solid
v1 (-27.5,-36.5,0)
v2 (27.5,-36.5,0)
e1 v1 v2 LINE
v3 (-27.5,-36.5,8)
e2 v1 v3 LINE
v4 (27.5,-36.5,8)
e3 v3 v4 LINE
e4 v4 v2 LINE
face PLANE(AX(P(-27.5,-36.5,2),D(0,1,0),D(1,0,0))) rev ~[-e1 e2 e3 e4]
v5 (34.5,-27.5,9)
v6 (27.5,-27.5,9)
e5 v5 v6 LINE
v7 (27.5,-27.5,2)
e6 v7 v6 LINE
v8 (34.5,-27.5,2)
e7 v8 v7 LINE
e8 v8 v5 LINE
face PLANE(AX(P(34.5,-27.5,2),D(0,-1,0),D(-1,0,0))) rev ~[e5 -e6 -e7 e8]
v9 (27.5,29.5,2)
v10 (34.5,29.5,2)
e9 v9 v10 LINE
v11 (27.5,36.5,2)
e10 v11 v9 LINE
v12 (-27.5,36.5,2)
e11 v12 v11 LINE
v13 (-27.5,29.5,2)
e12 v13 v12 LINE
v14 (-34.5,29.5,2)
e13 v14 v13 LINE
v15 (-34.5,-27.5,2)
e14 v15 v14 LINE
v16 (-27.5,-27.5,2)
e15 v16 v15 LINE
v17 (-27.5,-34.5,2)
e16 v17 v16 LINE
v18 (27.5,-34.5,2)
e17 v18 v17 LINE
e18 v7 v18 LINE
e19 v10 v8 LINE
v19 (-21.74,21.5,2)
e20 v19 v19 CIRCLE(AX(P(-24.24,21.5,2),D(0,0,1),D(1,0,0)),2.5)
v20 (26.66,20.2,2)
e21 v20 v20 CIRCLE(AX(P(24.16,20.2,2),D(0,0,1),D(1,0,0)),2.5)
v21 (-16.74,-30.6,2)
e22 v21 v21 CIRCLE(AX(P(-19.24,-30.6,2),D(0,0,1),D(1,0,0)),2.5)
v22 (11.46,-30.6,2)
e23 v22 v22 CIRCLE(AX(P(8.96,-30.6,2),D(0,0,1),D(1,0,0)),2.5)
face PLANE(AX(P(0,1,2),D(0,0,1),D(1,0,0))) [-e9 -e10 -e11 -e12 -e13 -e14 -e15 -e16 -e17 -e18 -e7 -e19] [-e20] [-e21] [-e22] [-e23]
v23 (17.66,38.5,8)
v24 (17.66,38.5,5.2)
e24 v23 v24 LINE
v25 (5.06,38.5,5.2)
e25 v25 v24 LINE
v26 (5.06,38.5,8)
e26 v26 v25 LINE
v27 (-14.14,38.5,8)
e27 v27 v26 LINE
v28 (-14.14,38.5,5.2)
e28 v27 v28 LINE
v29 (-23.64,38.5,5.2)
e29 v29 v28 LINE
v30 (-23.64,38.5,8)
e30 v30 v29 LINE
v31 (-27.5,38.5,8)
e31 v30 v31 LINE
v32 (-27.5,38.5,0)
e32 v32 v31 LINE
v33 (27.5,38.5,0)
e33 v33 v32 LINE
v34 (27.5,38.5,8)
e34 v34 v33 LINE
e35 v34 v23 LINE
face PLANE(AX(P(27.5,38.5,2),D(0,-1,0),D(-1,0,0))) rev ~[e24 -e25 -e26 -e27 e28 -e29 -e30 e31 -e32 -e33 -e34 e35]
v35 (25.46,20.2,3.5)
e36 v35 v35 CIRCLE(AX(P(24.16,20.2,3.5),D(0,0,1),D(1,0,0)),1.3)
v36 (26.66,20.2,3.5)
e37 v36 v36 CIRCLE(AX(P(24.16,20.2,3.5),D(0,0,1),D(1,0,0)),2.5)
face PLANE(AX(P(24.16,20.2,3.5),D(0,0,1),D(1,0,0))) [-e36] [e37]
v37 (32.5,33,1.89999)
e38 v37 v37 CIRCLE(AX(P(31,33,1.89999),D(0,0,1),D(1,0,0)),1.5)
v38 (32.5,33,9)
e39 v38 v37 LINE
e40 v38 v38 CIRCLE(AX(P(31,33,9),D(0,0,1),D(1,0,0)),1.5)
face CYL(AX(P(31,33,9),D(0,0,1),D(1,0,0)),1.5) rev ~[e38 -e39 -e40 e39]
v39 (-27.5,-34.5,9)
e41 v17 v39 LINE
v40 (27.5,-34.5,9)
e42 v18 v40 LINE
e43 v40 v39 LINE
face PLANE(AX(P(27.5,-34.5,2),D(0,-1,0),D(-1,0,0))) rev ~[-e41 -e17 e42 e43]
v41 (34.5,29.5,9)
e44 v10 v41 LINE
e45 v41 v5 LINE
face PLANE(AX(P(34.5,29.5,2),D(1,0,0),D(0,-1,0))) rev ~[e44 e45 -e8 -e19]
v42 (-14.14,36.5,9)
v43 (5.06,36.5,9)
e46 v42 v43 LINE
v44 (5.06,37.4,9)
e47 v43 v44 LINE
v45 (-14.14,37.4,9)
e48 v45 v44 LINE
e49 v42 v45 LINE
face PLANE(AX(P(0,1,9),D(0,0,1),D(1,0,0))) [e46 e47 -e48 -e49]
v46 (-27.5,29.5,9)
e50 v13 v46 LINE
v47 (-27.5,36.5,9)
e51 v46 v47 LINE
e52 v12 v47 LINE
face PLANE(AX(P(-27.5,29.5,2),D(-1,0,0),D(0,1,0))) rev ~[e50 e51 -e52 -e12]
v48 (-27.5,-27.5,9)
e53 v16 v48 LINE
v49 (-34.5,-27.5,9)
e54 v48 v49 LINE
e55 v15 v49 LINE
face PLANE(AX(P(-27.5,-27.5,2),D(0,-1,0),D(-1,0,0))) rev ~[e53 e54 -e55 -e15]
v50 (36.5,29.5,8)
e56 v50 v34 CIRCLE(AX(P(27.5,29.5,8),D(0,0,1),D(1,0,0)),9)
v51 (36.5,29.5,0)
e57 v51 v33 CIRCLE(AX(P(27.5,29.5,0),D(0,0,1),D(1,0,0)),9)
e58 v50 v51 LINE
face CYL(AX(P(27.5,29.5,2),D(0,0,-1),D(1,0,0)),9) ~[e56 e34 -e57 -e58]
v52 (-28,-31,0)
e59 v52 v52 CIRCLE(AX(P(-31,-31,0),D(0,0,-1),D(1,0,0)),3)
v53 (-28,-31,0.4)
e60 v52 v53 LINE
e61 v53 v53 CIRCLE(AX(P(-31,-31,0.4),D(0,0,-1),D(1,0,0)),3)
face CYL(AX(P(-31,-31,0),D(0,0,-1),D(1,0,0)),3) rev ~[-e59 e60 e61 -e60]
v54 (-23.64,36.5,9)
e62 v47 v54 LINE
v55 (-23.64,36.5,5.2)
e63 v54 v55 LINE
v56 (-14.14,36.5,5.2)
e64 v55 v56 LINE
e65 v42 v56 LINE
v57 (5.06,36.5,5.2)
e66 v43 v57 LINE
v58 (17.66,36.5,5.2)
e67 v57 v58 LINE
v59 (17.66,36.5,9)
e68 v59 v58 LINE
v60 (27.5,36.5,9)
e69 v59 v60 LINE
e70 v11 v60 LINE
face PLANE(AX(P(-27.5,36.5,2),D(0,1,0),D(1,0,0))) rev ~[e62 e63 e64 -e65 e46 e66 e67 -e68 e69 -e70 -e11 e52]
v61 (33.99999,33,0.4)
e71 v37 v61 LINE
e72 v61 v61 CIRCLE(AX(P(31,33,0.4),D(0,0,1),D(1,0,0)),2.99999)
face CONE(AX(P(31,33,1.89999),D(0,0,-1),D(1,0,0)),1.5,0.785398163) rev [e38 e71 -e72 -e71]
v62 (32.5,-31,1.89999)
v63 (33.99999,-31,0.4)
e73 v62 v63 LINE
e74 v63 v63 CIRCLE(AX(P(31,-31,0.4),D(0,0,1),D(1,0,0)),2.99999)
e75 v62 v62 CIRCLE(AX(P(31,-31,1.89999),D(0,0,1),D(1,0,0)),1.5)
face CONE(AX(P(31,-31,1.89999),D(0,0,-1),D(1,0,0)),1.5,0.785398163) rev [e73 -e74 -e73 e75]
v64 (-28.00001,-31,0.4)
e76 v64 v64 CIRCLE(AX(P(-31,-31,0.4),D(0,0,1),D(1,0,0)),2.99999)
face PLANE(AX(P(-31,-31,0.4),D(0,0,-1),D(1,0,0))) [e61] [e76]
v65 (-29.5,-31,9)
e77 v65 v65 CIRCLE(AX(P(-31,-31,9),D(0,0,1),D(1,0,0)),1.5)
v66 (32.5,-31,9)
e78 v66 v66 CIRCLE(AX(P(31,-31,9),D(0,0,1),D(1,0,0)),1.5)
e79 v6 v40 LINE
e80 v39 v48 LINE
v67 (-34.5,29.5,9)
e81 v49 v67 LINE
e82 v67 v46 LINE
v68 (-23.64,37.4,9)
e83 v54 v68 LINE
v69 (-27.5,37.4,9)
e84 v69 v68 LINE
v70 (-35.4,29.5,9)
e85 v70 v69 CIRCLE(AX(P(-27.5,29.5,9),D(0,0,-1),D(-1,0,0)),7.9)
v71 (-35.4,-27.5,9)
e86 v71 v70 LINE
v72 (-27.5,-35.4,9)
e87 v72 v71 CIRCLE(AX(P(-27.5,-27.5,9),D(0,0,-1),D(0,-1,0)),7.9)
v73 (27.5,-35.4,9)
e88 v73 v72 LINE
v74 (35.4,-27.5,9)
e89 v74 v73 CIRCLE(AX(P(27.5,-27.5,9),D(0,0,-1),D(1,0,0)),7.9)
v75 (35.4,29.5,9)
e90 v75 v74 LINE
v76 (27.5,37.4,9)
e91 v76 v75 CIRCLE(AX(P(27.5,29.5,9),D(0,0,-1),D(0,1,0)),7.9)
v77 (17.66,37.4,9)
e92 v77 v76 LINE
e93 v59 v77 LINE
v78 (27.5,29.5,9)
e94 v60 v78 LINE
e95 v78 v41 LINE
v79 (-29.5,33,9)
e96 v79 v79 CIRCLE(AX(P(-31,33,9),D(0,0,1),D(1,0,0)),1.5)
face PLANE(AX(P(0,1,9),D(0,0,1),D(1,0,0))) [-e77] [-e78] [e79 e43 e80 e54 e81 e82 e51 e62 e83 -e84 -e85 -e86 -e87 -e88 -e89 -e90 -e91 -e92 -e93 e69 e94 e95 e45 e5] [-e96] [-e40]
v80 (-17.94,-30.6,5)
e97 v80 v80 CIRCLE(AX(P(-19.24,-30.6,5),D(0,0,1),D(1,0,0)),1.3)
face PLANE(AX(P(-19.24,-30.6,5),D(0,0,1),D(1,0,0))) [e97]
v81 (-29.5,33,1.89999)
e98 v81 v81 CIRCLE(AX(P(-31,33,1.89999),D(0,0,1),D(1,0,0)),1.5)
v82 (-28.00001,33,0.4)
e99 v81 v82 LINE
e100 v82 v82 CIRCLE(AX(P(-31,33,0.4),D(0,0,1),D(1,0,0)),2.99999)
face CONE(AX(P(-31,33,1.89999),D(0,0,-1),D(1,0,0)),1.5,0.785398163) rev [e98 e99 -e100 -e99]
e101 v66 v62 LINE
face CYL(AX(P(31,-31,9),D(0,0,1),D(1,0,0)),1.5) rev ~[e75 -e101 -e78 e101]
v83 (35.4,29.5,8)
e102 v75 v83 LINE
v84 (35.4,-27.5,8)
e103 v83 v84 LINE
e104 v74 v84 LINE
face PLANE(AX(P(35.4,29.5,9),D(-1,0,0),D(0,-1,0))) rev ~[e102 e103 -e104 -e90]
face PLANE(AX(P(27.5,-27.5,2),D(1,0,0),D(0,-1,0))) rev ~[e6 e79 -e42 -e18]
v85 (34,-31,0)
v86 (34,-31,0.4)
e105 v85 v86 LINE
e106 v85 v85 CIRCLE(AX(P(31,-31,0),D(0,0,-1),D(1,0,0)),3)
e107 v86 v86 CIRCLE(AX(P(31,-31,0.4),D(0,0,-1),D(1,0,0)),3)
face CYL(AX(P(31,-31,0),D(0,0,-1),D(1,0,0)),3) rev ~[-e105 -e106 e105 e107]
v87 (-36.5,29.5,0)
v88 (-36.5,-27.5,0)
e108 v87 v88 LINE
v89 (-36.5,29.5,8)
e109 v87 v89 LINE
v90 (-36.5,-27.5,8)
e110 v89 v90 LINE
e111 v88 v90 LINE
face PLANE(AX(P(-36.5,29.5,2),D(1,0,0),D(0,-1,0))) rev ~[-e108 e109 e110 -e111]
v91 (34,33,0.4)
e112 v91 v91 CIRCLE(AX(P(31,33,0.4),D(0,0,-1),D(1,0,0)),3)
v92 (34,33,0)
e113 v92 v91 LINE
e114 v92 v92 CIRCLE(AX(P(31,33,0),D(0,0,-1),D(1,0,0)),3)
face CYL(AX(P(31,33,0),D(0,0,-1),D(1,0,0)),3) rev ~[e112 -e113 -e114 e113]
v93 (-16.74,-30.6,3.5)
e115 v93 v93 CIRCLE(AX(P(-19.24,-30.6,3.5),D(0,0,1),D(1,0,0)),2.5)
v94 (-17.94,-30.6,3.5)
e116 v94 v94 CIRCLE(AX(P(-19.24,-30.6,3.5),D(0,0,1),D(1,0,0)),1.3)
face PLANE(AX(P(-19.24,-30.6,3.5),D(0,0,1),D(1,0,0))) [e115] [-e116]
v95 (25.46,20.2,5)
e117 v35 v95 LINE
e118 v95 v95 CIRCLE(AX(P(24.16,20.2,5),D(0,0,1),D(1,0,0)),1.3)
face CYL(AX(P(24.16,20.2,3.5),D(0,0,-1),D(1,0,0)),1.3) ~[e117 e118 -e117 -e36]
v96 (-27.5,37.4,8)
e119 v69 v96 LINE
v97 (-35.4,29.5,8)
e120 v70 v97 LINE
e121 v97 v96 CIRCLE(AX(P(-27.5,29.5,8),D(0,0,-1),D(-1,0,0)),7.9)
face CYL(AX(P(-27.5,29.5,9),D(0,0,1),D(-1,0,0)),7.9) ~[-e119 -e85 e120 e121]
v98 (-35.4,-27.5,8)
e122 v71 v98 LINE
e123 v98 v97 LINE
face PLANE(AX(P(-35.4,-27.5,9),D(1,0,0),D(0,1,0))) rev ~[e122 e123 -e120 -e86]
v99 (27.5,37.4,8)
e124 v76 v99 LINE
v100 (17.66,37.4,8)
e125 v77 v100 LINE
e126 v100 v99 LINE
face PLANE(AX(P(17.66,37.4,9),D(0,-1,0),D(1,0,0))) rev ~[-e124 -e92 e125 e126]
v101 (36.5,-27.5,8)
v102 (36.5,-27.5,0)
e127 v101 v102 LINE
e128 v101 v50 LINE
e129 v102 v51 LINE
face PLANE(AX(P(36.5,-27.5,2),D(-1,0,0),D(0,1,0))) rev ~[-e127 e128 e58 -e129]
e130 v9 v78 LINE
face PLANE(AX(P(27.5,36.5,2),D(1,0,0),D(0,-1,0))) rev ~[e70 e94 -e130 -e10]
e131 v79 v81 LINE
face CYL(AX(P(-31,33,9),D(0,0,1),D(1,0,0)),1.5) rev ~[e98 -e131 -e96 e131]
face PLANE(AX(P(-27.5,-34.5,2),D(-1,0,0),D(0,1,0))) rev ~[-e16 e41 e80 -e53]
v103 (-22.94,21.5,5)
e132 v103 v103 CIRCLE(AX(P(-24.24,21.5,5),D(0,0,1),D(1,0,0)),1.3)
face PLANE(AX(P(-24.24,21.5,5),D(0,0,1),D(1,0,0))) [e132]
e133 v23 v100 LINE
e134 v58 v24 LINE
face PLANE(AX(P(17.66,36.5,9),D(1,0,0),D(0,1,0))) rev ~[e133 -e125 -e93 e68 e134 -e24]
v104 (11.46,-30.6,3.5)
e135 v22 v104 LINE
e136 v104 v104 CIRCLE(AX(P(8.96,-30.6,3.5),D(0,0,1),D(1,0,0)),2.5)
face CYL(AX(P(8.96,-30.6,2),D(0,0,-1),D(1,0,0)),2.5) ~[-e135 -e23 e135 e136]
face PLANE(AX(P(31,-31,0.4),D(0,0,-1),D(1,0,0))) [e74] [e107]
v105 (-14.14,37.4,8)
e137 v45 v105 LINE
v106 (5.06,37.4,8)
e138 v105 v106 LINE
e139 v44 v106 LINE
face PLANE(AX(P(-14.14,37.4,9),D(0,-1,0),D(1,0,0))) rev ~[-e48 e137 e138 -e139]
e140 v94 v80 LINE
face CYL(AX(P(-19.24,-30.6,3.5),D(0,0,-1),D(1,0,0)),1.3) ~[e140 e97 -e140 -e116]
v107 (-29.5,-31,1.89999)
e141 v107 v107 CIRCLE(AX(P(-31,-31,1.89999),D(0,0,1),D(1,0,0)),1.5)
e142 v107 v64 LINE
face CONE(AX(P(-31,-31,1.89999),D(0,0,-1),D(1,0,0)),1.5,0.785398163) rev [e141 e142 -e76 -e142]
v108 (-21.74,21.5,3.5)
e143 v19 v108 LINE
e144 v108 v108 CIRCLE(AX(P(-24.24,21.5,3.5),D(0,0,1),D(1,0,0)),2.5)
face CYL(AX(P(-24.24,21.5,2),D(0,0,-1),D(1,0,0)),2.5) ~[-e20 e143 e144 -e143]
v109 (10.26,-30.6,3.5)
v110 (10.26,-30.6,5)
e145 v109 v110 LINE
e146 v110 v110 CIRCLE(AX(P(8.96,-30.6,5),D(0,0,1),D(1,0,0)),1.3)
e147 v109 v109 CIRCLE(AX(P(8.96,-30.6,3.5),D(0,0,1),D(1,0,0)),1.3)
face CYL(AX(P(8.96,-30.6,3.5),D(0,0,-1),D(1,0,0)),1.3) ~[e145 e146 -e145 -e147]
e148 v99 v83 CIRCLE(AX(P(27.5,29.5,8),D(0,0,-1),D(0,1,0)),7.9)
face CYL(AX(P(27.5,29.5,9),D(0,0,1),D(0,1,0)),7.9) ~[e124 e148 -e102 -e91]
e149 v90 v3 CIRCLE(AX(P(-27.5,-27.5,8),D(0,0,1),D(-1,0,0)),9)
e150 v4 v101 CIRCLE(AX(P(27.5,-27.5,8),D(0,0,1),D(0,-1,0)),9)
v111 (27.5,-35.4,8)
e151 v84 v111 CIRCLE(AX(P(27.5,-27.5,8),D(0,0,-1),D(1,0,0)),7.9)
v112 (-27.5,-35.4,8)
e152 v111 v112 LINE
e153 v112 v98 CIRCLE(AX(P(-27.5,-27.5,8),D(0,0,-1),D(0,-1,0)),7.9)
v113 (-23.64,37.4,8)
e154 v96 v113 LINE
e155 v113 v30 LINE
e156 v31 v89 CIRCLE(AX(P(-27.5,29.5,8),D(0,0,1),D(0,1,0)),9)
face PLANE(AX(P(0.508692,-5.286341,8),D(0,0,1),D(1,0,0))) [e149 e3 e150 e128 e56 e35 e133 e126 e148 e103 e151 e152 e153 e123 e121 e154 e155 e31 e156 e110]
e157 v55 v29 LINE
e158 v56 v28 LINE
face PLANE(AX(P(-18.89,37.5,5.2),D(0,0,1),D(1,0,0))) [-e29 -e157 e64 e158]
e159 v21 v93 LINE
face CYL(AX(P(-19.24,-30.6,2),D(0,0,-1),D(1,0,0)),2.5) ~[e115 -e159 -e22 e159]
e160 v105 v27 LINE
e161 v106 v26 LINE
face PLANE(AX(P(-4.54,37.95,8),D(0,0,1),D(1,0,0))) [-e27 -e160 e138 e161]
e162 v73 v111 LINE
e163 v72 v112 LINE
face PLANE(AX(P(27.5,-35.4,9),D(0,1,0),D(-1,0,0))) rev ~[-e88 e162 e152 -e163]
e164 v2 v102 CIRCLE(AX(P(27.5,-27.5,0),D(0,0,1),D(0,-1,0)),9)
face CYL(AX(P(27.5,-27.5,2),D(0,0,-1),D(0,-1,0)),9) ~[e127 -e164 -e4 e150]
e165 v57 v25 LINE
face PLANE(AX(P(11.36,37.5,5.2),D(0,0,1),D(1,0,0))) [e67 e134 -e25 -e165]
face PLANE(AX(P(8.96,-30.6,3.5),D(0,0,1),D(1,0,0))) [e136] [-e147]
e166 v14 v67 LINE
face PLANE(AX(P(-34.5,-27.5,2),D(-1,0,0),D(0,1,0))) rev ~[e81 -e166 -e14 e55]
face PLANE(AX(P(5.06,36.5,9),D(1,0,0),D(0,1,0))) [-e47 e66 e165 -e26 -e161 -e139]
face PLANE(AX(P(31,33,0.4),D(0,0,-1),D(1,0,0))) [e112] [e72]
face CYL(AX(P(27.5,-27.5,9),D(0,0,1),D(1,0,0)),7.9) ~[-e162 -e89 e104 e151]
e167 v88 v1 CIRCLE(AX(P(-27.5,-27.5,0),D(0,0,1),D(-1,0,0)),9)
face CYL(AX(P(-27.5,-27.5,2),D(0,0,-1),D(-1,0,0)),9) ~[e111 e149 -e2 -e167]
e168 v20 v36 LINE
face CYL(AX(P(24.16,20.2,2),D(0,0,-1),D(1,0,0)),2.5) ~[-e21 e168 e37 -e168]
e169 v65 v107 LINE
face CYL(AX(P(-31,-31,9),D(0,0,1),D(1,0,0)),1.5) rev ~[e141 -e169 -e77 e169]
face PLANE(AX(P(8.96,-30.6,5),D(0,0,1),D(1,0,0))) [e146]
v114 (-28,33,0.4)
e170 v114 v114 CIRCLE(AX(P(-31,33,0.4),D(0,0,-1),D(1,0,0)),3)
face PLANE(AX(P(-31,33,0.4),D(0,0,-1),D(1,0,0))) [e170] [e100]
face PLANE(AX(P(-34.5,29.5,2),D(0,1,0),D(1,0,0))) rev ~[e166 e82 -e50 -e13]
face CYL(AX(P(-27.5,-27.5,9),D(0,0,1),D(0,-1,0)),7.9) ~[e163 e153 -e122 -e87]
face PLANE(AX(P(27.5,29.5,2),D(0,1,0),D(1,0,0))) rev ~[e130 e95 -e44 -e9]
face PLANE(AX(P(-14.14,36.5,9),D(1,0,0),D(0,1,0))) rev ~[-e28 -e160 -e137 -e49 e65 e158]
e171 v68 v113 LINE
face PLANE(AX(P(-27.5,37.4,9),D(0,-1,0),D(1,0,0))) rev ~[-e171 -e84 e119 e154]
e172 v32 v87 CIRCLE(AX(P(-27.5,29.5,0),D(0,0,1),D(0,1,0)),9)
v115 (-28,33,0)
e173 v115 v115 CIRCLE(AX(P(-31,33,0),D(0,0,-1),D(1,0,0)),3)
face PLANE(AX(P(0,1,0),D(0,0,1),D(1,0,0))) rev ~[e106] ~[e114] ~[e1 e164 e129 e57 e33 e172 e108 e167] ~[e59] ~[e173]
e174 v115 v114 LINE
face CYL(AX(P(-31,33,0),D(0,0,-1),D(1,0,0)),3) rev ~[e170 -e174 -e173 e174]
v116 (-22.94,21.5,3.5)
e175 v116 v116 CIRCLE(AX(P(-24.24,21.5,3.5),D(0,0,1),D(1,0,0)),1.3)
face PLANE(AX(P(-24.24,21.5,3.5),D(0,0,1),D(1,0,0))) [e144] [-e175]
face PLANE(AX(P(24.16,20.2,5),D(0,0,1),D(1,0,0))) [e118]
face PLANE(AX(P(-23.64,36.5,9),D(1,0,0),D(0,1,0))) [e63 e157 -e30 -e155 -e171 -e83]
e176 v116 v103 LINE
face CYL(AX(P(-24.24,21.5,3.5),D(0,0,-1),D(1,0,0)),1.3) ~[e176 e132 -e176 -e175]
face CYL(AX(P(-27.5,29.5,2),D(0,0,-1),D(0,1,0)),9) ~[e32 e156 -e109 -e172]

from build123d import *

# Parameters (mm, degrees)
F1_DEPTH  = 2
F2_R      = 2.5
F3_DEPTH  = 1.5
F4_R      = 1.3
F5_DEPTH  = 1.5
F7_DEPTH  = 7
F8_R      = 1.5
F9_DEPTH  = 10
F10_W     = 12.6
F10_H     = 2
F10_W_2   = 9.5
F11_DEPTH = 3.8
F12_R     = 3
F13_DEPTH = 0.4
F14_SIZE  = 1.49999
F15_W     = 19.2
F15_H     = 1.1
F16_DEPTH = 1


# Not quite as in the source:
# - a fillet or chamfer is up to 0.001 mm smaller than in the source, because OpenCascade refuses the exact size


with BuildPart() as f1:
    # F0 (on Top) → F1 (new body)
    with BuildSketch(Plane.XY):
        with BuildLine():
            Line((27.5, 38.5), (-27.5, 38.5))
            ThreePointArc((-27.5, 38.5), (-33.8639610307, 35.8639610307), (-36.5, 29.5))
            Line((-36.5, 29.5), (-36.5, -27.5))
            ThreePointArc((-36.5, -27.5), (-33.8639610307, -33.8639610307), (-27.5, -36.5))
            Line((-27.5, -36.5), (27.5, -36.5))
            ThreePointArc((27.5, -36.5), (33.8639610307, -33.8639610307), (36.5, -27.5))
            Line((36.5, -27.5), (36.5, 29.5))
            ThreePointArc((36.5, 29.5), (33.8639610307, 35.8639610307), (27.5, 38.5))
        make_face()
    extrude(amount=F1_DEPTH)

    # F2 (on face) → F3 (join)
    with BuildSketch(Plane.XY.offset(2)):
        with Locations((-19.24, -30.6)):
            Circle(F2_R)
        with Locations((8.96, -30.6)):
            Circle(F2_R)
        with Locations((24.16, 20.2)):
            Circle(F2_R)
        with Locations((-24.24, 21.5)):
            Circle(F2_R)
    extrude(amount=F3_DEPTH)

    # F4 (on face) → F5 (join)
    with BuildSketch(Plane.XY.offset(3.5)):
        with Locations((-19.24, -30.6)):
            Circle(F4_R)
        with Locations((8.96, -30.6)):
            Circle(F4_R)
        with Locations((24.16, 20.2)):
            Circle(F4_R)
        with Locations((-24.24, 21.5)):
            Circle(F4_R)
    extrude(amount=F5_DEPTH)

    # F6 (on face) → F7 (join)
    with BuildSketch(Plane.XY.offset(2)):
        with BuildLine():
            Line((27.5, 38.5), (-27.5, 38.5))
            ThreePointArc((-27.5, 38.5), (-33.8639610307, 35.8639610307), (-36.5, 29.5))
            Line((-36.5, 29.5), (-36.5, -27.5))
            ThreePointArc((-36.5, -27.5), (-33.8639610307, -33.8639610307), (-27.5, -36.5))
            Line((-27.5, -36.5), (27.5, -36.5))
            ThreePointArc((27.5, -36.5), (33.8639610307, -33.8639610307), (36.5, -27.5))
            Line((36.5, -27.5), (36.5, 29.5))
            ThreePointArc((36.5, 29.5), (33.8639610307, 35.8639610307), (27.5, 38.5))
        make_face()
        Polygon((-27.5, 29.5), (-27.5, 36.5), (27.5, 36.5), (27.5, 29.5), (34.5, 29.5), (34.5, -27.5), (27.5, -27.5), (27.5, -34.5), (-27.5, -34.5), (-27.5, -27.5), (-34.5, -27.5), (-34.5, 29.5), align=None, mode=Mode.SUBTRACT)
    extrude(amount=F7_DEPTH)

    # F8 (on face) → F9 (cut)
    with BuildSketch(Plane.XY.offset(9)):
        with Locations((-31, 33)):
            Circle(F8_R)
        with Locations((31, 33)):
            Circle(F8_R)
        with Locations((-31, -31)):
            Circle(F8_R)
        with Locations((31, -31)):
            Circle(F8_R)
    extrude(amount=-F9_DEPTH, mode=Mode.SUBTRACT)

    # F10 (on face) → F11 (cut)
    with BuildSketch(Plane.XY.offset(9)):
        with Locations((11.36, 37.5)):
            Rectangle(F10_W, F10_H)
        with Locations((-18.89, 37.5)):
            Rectangle(F10_W_2, F10_H)
    extrude(amount=-F11_DEPTH, mode=Mode.SUBTRACT)

    # F12 (on face) → F13 (cut)
    with BuildSketch(Plane(origin=(0, 0, 0), x_dir=(1, 0, 0), z_dir=(0, 0, -1))):
        with Locations((31, -33)):
            Circle(F12_R)
        with Locations((-31, -33)):
            Circle(F12_R)
        with Locations((-31, 31)):
            Circle(F12_R)
        with Locations((31, 31)):
            Circle(F12_R)
    extrude(amount=-F13_DEPTH, mode=Mode.SUBTRACT)

    # F14 (size 1.5 in the source; OpenCascade refuses exactly that, so slightly less here)
    f14_edges = [f1.edges().sort_by_distance(p)[0] for p in [
        (29.5, 33, 0.4),
        (-32.5, 33, 0.4),
        (29.5, -31, 0.4),
        (-32.5, -31, 0.4),
    ]]
    chamfer(f14_edges, length=F14_SIZE)

    # F15 (on face) → F16 (cut)
    with BuildSketch(Plane.XY.offset(9)):
        with BuildLine():
            Line((-23.64, 38.5), (-27.5, 38.5))
            ThreePointArc((-27.5, 38.5), (-33.8639610307, 35.8639610307), (-36.5, 29.5))
            Line((-36.5, 29.5), (-36.5, -27.5))
            ThreePointArc((-36.5, -27.5), (-33.8639610307, -33.8639610307), (-27.5, -36.5))
            Line((-27.5, -36.5), (27.5, -36.5))
            ThreePointArc((27.5, -36.5), (33.8639610307, -33.8639610307), (36.5, -27.5))
            Line((36.5, -27.5), (36.5, 29.5))
            ThreePointArc((36.5, 29.5), (33.8639610307, 35.8639610307), (27.5, 38.5))
            Line((27.5, 38.5), (17.66, 38.5))
            Line((17.66, 38.5), (17.66, 37.4))
            Line((17.66, 37.4), (27.5, 37.4))
            ThreePointArc((27.5, 37.4), (33.0861435714, 35.0861435714), (35.4, 29.5))
            Line((35.4, 29.5), (35.4, -27.5))
            ThreePointArc((35.4, -27.5), (33.0861435714, -33.0861435714), (27.5, -35.4))
            Line((27.5, -35.4), (-27.5, -35.4))
            ThreePointArc((-27.5, -35.4), (-33.0861435714, -33.0861435714), (-35.4, -27.5))
            Line((-35.4, -27.5), (-35.4, 29.5))
            ThreePointArc((-35.4, 29.5), (-33.0861435714, 35.0861435714), (-27.5, 37.4))
            Line((-27.5, 37.4), (-23.64, 37.4))
            Line((-23.64, 37.4), (-23.64, 38.5))
        make_face()
        with Locations((-4.54, 37.95)):
            Rectangle(F15_W, F15_H)
    extrude(amount=-F16_DEPTH, mode=Mode.SUBTRACT)


solid = f1.part
